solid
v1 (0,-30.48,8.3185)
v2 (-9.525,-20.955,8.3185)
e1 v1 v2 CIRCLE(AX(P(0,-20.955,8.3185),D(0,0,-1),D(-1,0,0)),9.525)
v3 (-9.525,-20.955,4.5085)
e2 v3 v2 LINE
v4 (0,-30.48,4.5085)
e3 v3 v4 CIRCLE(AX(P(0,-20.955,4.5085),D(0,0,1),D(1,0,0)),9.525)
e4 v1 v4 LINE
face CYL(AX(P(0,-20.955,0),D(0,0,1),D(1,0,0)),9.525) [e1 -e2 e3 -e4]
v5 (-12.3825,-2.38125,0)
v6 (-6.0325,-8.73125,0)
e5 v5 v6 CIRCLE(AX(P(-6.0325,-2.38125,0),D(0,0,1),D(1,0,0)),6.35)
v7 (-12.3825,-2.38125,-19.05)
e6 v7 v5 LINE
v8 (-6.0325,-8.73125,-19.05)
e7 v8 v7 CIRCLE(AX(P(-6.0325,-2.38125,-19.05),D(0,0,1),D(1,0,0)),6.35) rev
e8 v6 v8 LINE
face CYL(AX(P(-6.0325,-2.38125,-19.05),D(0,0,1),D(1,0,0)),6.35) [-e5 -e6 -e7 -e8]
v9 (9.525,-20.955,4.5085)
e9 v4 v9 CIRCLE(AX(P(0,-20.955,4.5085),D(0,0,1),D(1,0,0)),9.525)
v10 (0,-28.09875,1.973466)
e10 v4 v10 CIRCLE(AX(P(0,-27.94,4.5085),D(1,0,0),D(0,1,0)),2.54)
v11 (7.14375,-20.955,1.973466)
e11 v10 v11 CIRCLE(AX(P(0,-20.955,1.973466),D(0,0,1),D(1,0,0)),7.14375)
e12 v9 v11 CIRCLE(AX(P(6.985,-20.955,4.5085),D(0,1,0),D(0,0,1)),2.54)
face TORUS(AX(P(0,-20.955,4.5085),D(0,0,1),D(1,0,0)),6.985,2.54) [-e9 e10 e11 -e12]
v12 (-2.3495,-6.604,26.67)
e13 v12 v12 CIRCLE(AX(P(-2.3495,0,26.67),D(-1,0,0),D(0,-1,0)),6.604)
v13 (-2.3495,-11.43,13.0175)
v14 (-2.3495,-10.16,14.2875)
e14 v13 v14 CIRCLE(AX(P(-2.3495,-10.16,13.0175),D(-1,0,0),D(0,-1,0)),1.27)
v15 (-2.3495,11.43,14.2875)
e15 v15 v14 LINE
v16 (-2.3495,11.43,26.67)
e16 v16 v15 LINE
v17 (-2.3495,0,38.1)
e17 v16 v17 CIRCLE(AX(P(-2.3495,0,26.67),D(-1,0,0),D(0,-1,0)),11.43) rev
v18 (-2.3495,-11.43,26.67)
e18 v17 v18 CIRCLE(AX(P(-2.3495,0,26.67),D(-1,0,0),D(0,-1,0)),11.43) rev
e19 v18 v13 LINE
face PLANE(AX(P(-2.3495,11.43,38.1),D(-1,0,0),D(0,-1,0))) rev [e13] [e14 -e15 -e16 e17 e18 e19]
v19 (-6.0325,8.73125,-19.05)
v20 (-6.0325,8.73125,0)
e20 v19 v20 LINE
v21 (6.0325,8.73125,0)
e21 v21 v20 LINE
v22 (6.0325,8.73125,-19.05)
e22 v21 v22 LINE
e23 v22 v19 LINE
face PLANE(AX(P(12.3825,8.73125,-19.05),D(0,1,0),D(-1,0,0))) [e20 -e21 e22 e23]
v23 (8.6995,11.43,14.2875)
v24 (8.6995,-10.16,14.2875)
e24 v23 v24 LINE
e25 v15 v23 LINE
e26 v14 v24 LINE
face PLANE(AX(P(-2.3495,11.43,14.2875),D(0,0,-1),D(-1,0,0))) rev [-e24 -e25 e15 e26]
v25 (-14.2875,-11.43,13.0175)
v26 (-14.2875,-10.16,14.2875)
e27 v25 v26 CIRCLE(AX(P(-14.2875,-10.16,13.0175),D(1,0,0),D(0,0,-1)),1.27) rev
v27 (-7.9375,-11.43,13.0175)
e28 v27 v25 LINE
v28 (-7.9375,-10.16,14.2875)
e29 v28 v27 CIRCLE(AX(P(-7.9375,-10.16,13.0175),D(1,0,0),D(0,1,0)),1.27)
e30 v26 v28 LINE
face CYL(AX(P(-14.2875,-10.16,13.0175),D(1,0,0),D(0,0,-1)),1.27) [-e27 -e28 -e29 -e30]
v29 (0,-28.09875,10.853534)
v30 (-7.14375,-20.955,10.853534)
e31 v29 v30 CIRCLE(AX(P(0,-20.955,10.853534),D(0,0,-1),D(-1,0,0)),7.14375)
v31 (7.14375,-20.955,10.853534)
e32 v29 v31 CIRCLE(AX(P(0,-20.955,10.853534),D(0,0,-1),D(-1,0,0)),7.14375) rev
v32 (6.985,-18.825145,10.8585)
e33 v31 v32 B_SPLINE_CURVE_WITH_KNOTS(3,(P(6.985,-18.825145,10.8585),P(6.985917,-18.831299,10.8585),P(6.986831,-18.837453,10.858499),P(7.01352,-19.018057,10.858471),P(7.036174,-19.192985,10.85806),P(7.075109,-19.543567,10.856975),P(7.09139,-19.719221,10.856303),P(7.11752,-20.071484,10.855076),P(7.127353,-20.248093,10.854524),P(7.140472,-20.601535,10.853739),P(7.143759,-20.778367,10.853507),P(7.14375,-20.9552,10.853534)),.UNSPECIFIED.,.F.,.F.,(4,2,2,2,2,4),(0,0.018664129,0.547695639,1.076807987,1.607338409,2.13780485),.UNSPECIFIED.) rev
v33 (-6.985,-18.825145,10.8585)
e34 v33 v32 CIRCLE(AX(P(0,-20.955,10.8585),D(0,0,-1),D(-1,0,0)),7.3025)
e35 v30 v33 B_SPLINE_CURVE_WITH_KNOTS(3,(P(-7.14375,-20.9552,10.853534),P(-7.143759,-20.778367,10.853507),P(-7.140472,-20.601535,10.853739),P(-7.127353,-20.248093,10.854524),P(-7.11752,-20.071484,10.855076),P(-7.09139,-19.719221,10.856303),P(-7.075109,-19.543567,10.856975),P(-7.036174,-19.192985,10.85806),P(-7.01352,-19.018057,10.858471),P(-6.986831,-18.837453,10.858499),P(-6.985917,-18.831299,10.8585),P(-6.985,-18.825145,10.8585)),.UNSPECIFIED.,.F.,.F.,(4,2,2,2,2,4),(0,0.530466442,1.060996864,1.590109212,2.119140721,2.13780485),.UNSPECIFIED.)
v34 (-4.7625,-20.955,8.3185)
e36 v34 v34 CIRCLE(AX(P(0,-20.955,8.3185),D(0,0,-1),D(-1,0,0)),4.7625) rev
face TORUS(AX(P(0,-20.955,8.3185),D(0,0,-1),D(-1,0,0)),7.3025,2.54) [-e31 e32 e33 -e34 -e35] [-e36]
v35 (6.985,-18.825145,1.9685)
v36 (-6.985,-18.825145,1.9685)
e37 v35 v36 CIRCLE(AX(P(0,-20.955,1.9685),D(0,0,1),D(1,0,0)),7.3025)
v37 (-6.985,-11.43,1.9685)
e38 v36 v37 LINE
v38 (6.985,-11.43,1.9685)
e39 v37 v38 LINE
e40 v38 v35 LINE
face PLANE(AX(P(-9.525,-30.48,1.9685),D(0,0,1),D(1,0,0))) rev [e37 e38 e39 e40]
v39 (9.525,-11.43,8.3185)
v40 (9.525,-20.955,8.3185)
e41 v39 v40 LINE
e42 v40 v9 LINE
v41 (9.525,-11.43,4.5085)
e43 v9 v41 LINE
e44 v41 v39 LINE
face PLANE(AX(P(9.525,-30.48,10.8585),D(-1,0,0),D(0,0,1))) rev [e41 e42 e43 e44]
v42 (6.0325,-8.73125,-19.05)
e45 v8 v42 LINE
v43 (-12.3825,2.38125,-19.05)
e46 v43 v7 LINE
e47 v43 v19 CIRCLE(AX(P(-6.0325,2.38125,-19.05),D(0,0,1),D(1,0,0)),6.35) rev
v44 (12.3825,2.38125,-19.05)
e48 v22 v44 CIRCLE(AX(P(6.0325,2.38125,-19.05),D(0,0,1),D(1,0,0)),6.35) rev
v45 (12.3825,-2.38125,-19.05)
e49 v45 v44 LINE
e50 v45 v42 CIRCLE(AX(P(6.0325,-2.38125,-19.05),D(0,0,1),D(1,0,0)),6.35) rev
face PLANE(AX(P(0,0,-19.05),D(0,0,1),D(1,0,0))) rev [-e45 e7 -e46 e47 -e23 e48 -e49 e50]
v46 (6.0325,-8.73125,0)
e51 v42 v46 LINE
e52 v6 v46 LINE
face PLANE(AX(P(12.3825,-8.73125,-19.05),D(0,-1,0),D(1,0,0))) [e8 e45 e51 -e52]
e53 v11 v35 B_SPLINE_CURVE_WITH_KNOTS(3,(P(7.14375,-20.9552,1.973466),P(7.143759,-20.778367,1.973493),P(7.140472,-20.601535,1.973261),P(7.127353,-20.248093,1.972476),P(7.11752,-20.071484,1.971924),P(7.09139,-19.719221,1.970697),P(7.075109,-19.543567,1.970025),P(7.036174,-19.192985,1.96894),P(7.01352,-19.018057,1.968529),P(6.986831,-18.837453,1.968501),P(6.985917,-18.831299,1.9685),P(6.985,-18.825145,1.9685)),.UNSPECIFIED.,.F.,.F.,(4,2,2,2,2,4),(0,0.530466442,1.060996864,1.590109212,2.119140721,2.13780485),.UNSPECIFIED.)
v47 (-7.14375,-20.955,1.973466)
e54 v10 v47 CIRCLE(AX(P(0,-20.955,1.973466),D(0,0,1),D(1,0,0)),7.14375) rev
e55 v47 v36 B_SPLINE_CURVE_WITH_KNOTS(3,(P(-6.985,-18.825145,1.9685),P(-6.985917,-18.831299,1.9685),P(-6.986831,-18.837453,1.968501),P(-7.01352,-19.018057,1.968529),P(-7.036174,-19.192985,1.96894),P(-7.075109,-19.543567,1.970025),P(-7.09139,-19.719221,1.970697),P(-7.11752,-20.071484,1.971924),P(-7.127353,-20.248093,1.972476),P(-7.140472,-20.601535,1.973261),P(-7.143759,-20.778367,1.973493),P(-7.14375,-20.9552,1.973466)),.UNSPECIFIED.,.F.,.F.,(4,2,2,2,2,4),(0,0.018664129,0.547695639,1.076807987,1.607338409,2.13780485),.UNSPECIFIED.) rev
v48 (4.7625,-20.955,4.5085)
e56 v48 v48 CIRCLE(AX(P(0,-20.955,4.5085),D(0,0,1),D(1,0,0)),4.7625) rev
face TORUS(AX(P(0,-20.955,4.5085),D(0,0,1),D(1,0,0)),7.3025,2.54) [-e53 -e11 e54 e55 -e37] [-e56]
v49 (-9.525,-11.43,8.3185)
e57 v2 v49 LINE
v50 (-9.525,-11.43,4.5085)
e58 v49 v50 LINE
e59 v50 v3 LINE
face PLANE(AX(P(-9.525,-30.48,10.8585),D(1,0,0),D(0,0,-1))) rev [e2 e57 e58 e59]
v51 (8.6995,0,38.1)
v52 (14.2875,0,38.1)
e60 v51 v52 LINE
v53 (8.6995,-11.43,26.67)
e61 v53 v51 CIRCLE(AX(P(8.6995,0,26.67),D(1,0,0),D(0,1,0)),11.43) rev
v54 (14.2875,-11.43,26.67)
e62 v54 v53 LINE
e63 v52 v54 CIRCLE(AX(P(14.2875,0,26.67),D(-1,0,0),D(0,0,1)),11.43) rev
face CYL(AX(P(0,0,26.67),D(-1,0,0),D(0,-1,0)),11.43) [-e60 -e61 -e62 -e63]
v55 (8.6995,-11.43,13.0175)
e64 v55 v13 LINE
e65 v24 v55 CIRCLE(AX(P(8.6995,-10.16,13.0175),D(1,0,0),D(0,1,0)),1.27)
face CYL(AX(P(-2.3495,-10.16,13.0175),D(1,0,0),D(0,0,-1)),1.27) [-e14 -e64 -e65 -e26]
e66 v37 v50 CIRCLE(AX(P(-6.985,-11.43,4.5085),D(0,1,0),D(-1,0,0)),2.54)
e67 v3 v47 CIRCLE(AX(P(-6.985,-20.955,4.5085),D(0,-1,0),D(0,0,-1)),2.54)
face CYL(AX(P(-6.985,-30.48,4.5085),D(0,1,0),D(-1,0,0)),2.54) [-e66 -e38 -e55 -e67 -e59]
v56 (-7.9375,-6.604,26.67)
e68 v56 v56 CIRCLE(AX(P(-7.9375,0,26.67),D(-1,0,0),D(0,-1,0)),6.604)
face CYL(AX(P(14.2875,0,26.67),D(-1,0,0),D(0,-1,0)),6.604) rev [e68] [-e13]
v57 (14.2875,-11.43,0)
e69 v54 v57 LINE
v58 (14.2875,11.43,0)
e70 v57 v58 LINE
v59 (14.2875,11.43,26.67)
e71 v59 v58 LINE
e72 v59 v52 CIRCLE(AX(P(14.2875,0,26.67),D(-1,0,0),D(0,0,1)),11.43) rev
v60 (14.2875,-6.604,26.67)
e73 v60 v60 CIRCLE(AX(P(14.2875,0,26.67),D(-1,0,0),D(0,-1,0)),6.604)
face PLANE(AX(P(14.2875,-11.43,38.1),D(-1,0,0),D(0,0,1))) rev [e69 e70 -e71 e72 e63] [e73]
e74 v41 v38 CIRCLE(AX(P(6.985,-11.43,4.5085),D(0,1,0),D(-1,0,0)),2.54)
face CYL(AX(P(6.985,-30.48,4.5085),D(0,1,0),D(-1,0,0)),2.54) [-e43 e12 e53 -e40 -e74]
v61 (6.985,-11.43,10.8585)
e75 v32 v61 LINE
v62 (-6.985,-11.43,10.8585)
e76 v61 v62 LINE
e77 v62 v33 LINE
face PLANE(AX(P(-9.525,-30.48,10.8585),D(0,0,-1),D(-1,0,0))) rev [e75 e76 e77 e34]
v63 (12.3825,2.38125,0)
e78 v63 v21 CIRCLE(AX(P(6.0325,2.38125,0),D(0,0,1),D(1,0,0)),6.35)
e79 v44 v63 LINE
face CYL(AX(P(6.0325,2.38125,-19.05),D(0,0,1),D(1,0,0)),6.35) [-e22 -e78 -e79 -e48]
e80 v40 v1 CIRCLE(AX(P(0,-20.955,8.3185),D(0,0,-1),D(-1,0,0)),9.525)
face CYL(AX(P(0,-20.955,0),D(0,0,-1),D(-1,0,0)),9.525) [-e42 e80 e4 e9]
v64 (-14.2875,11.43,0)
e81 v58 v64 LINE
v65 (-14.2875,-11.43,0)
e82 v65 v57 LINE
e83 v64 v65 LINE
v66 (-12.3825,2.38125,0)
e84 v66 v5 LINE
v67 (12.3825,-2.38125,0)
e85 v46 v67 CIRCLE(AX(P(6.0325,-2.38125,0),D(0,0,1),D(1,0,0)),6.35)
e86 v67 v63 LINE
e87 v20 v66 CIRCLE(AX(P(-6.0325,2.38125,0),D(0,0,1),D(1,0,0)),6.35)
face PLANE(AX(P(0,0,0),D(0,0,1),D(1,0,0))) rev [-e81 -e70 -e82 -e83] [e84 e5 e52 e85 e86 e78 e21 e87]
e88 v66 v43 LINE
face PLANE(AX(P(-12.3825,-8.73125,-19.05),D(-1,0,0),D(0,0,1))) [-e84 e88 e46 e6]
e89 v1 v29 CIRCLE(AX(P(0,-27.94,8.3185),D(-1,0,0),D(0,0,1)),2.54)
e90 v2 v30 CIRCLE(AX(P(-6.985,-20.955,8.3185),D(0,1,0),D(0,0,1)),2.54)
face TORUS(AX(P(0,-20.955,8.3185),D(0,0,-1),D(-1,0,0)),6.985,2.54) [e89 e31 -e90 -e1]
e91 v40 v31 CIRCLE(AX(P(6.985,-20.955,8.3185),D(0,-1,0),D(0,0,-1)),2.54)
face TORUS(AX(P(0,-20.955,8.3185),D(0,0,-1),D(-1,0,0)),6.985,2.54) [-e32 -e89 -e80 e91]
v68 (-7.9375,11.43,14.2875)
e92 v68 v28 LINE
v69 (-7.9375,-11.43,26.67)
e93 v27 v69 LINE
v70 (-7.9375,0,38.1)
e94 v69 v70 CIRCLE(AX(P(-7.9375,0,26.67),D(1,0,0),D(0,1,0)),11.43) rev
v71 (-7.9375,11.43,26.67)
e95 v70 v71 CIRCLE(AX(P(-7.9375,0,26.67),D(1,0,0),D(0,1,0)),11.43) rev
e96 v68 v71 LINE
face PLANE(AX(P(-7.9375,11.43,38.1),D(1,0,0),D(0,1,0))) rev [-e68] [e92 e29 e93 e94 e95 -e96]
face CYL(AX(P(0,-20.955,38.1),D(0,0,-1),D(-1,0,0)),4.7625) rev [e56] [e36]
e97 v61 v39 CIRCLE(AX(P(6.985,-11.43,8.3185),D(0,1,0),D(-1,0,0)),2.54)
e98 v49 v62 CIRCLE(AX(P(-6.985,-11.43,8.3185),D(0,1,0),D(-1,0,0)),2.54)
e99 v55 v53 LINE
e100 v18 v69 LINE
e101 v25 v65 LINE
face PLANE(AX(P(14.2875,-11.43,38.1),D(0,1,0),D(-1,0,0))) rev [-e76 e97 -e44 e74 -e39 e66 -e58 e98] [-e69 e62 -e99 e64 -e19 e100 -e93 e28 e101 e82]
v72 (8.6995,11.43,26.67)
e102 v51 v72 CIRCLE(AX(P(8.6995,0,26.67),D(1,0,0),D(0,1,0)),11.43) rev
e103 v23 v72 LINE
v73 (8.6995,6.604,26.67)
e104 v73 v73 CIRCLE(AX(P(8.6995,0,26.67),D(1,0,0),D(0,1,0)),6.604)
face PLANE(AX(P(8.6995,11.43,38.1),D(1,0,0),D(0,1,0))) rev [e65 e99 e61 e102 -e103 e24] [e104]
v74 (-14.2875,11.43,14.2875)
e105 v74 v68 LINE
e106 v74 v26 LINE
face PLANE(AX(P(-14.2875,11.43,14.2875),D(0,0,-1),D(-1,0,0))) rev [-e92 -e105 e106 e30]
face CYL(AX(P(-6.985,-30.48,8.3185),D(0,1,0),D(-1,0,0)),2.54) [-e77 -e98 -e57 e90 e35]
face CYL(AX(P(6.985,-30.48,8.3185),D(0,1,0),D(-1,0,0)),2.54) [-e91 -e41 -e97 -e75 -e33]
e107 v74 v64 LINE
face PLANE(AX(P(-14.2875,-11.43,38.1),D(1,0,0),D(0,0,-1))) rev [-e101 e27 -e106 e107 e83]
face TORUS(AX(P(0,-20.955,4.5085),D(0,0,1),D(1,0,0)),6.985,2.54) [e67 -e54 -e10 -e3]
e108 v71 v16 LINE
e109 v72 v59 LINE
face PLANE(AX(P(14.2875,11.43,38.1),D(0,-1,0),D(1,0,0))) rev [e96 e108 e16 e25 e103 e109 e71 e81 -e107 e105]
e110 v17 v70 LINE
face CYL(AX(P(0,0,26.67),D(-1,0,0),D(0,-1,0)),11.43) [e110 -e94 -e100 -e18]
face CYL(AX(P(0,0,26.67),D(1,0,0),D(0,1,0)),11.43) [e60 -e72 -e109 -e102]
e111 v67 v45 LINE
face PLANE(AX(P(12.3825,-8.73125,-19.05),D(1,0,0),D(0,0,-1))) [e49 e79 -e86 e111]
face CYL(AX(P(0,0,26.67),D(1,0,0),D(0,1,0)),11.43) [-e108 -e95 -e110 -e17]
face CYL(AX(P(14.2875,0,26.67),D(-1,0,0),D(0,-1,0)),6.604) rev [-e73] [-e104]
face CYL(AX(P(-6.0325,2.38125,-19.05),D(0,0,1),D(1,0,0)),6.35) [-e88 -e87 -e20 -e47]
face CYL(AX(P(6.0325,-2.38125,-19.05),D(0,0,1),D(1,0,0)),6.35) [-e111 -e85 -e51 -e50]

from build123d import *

# Parameters (mm, degrees)
SKETCH2_W           = 24.765
SKETCH2_H           = 17.4625
BOSS_EXTRUDE1_DEPTH = 19.05
SKETCH3_W           = 28.575
SKETCH3_H           = 22.86
BOSS_EXTRUDE2_DEPTH = 38.1
SKETCH4_W           = 6.35
SKETCH4_H           = 23.8125
SKETCH4_W_2         = 11.049
CUT_EXTRUDE1_DEPTH  = 47.6725
SKETCH5_W           = 19.05
SKETCH5_H           = 8.89
BOSS_EXTRUDE3_DEPTH = 19.05
FILLET1_R           = 9.525
SKETCH6_R           = 4.7625
CUT_EXTRUDE2_DEPTH  = 50.382672553
FILLET5_R           = 11.43
SKETCH7_R           = 6.604
CUT_EXTRUDE3_DEPTH  = 54.615212627
FILLET2_R           = 2.54
FILLET3_R           = 6.35
FILLET6_R           = 1.27


# Some blends are built 0.0001 mm under size
with BuildPart() as part:
    # Sketch2 → Boss-Extrude1 (new body)
    with BuildSketch(Plane.XY):
        Rectangle(SKETCH2_W, SKETCH2_H)
    extrude(amount=-BOSS_EXTRUDE1_DEPTH)

    # Sketch3 → Boss-Extrude2 (add)
    with BuildSketch(Plane.XY):
        Rectangle(SKETCH3_W, SKETCH3_H)
    extrude(amount=BOSS_EXTRUDE2_DEPTH)

    # Sketch4 → Cut-Extrude1 (cut, through all)
    with BuildSketch(Plane(origin=(0, -11.43, 0), x_dir=(-1, 0, 0), z_dir=(0, -1, 0))):
        with Locations((11.1125, -26.19375)):
            Rectangle(SKETCH4_W, SKETCH4_H)
        with Locations((-3.175, -26.19375)):
            Rectangle(SKETCH4_W_2, SKETCH4_H)
    extrude(amount=-CUT_EXTRUDE1_DEPTH, mode=Mode.SUBTRACT)

    # Sketch5 → Boss-Extrude3 (add)
    with BuildSketch(Plane.XZ.offset(11.43)):
        with Locations((0, 6.4135)):
            Rectangle(SKETCH5_W, SKETCH5_H)
    extrude(amount=BOSS_EXTRUDE3_DEPTH)

    # Fillet1
    fillet1_edges = [part.edges().sort_by_distance(p)[0] for p in [
        (9.525, -30.48, 6.4135),
        (-9.525, -30.48, 6.4135),
    ]]
    fillet(fillet1_edges, radius=FILLET1_R - 0.0001)  # a hair under: the kernel refuses the full size

    # Sketch6 → Cut-Extrude2 (cut, through all)
    with BuildSketch(Plane(origin=(0, 0, 1.9685), x_dir=(-1, 0, 0), z_dir=(0, 0, -1))):
        with Locations((0, -20.955)):
            Circle(SKETCH6_R)
    extrude(amount=-CUT_EXTRUDE2_DEPTH, mode=Mode.SUBTRACT)

    # Fillet5
    fillet5_edges = [part.edges().sort_by_distance(p)[0] for p in [
        (-5.1435, -11.43, 38.1),
        (-5.1435, 11.43, 38.1),
        (11.4935, 11.43, 38.1),
        (11.4935, -11.43, 38.1),
    ]]
    fillet(fillet5_edges, radius=FILLET5_R - 0.0001)  # a hair under: the kernel refuses the full size

    # Sketch7 → Cut-Extrude3 (cut, through all)
    with BuildSketch(Plane.ZY.offset(7.9375)):
        with Locations(Location((26.67, 0, 0), (0, 0, 270))):
            Circle(SKETCH7_R)
    extrude(amount=-CUT_EXTRUDE3_DEPTH, mode=Mode.SUBTRACT)

    # Fillet2
    # the kernel refuses this fillet: 2.54 mm, written as the material it takes off along each edge
    with BuildSketch(Plane(origin=(-9.525, -11.43, 10.8585), x_dir=(0, 0, -1), z_dir=(0, -1, 0))) as fillet2_piece_1:
        with BuildLine():
            CenterArc((FILLET2_R, FILLET2_R), FILLET2_R, 180, 90)
            Line((0, FILLET2_R), (0, 0))
            Line((0, 0), (FILLET2_R, 0))
        make_face()
    extrude(amount=9.5251, mode=Mode.SUBTRACT)
    with BuildSketch(Plane(origin=(9.525, -11.43, 10.8585), x_dir=(0, 0, -1), z_dir=(0, -1, 0)), Plane(origin=(9.525, -11.43, 1.9685), x_dir=(-1, 0, 0), z_dir=(0, -1, 0)), Plane(origin=(-9.525, -11.43, 1.9685), x_dir=(0, 0, 1), z_dir=(0, -1, 0))) as fillet2_piece_2:
        with BuildLine():
            CenterArc((FILLET2_R, -FILLET2_R), FILLET2_R, 90, 90)
            Line((0, -FILLET2_R), (0, 0))
            Line((0, 0), (FILLET2_R, 0))
        make_face()
    extrude(amount=9.5251, mode=Mode.SUBTRACT)
    with BuildSketch(Plane(origin=(-0.0001, -20.9551, 10.8585), x_dir=(-1, 0, 0), z_dir=(0, 1, 0))) as fillet2_piece_3:
        with BuildLine():
            CenterArc((9.5249 - FILLET2_R, -FILLET2_R), FILLET2_R, 360, 90)
            Line((9.5249, -FILLET2_R), (9.5249, 0))
            Line((9.5249, 0), (9.5249 - FILLET2_R, 0))
        make_face()
    revolve(axis=Axis((-0.0001, -20.9551, 10.8585), (0, 0, 1)), revolution_arc=90, mode=Mode.SUBTRACT)
    with BuildSketch(Plane(origin=(0.0001, -20.9551, 10.8585), x_dir=(1, 0, 0), z_dir=(0, 1, 0))) as fillet2_piece_4:
        with BuildLine():
            CenterArc((9.5249 - FILLET2_R, FILLET2_R), FILLET2_R, 270, 90)
            Line((9.5249, FILLET2_R), (9.5249, 0))
            Line((9.5249, 0), (9.5249 - FILLET2_R, 0))
        make_face()
    revolve(axis=Axis((0.0001, -20.9551, 10.8585), (0, 0, -1)), revolution_arc=90, mode=Mode.SUBTRACT)
    with BuildSketch(Plane(origin=(-0.0001, -20.9551, 1.9685), x_dir=(-1, 0, 0), z_dir=(0, 1, 0))) as fillet2_piece_5:
        with BuildLine():
            CenterArc((9.5249 - FILLET2_R, FILLET2_R), FILLET2_R, 270, 90)
            Line((9.5249, FILLET2_R), (9.5249, 0))
            Line((9.5249, 0), (9.5249 - FILLET2_R, 0))
        make_face()
    revolve(axis=Axis((-0.0001, -20.9551, 1.9685), (0, 0, 1)), revolution_arc=90, mode=Mode.SUBTRACT)
    with BuildSketch(Plane(origin=(0.0001, -20.9551, 1.9685), x_dir=(1, 0, 0), z_dir=(0, 1, 0))) as fillet2_piece_6:
        with BuildLine():
            CenterArc((9.5249 - FILLET2_R, -FILLET2_R), FILLET2_R, 0, 90)
            Line((9.5249, -FILLET2_R), (9.5249, 0))
            Line((9.5249, 0), (9.5249 - FILLET2_R, 0))
        make_face()
    revolve(axis=Axis((0.0001, -20.9551, 1.9685), (0, 0, -1)), revolution_arc=90, mode=Mode.SUBTRACT)
    with BuildSketch(Plane(origin=(0, -20.955, 10.8585), x_dir=(-1, 0, 0), z_dir=(0, -1, 0))) as fillet2_piece_7:
        with BuildLine():
            CenterArc((4.7625 + FILLET2_R, FILLET2_R), FILLET2_R, 180, 90)
            Line((4.7625, FILLET2_R), (4.7625, 0))
            Line((4.7625, 0), (4.7625 + FILLET2_R, 0))
        make_face()
    revolve(axis=Axis((0, -20.955, 10.8585), (0, 0, -1)), mode=Mode.SUBTRACT)
    with BuildSketch(Plane(origin=(0, -20.955, 1.9685), x_dir=(-1, 0, 0), z_dir=(0, -1, 0))) as fillet2_piece_8:
        with BuildLine():
            CenterArc((4.7625 + FILLET2_R, -FILLET2_R), FILLET2_R, 90, 90)
            Line((4.7625, -FILLET2_R), (4.7625, 0))
            Line((4.7625, 0), (4.7625 + FILLET2_R, 0))
        make_face()
    revolve(axis=Axis((0, -20.955, 1.9685), (0, 0, -1)), mode=Mode.SUBTRACT)
    with BuildSketch(Plane(origin=(0.0001, -30.48, 1.9685), x_dir=(0, 1, 0), z_dir=(-1, 0, 0)), Plane(origin=(-0.0001, -30.48, 10.8585), x_dir=(0, 1, 0), z_dir=(1, 0, 0))) as fillet2_piece_9:
        with BuildLine():
            CenterArc((FILLET2_R, -FILLET2_R), FILLET2_R, 90, 90)
            Line((0, -FILLET2_R), (0, 0))
            Line((0, 0), (FILLET2_R, 0))
        make_face()
    extrude(amount=0.0002, mode=Mode.SUBTRACT)

    # Fillet3
    fillet3_edges = [part.edges().sort_by_distance(p)[0] for p in [
        (-12.3825, 8.73125, -9.525),
        (12.3825, 8.73125, -9.525),
        (12.3825, -8.73125, -9.525),
        (-12.3825, -8.73125, -9.525),
    ]]
    fillet(fillet3_edges, radius=FILLET3_R)

    # Fillet6
    fillet6_edges = [part.edges().sort_by_distance(p)[0] for p in [
        (-11.1125, -11.43, 14.2875),
        (3.175, -11.43, 14.2875),
    ]]
    fillet(fillet6_edges, radius=FILLET6_R)


solid = part.part
